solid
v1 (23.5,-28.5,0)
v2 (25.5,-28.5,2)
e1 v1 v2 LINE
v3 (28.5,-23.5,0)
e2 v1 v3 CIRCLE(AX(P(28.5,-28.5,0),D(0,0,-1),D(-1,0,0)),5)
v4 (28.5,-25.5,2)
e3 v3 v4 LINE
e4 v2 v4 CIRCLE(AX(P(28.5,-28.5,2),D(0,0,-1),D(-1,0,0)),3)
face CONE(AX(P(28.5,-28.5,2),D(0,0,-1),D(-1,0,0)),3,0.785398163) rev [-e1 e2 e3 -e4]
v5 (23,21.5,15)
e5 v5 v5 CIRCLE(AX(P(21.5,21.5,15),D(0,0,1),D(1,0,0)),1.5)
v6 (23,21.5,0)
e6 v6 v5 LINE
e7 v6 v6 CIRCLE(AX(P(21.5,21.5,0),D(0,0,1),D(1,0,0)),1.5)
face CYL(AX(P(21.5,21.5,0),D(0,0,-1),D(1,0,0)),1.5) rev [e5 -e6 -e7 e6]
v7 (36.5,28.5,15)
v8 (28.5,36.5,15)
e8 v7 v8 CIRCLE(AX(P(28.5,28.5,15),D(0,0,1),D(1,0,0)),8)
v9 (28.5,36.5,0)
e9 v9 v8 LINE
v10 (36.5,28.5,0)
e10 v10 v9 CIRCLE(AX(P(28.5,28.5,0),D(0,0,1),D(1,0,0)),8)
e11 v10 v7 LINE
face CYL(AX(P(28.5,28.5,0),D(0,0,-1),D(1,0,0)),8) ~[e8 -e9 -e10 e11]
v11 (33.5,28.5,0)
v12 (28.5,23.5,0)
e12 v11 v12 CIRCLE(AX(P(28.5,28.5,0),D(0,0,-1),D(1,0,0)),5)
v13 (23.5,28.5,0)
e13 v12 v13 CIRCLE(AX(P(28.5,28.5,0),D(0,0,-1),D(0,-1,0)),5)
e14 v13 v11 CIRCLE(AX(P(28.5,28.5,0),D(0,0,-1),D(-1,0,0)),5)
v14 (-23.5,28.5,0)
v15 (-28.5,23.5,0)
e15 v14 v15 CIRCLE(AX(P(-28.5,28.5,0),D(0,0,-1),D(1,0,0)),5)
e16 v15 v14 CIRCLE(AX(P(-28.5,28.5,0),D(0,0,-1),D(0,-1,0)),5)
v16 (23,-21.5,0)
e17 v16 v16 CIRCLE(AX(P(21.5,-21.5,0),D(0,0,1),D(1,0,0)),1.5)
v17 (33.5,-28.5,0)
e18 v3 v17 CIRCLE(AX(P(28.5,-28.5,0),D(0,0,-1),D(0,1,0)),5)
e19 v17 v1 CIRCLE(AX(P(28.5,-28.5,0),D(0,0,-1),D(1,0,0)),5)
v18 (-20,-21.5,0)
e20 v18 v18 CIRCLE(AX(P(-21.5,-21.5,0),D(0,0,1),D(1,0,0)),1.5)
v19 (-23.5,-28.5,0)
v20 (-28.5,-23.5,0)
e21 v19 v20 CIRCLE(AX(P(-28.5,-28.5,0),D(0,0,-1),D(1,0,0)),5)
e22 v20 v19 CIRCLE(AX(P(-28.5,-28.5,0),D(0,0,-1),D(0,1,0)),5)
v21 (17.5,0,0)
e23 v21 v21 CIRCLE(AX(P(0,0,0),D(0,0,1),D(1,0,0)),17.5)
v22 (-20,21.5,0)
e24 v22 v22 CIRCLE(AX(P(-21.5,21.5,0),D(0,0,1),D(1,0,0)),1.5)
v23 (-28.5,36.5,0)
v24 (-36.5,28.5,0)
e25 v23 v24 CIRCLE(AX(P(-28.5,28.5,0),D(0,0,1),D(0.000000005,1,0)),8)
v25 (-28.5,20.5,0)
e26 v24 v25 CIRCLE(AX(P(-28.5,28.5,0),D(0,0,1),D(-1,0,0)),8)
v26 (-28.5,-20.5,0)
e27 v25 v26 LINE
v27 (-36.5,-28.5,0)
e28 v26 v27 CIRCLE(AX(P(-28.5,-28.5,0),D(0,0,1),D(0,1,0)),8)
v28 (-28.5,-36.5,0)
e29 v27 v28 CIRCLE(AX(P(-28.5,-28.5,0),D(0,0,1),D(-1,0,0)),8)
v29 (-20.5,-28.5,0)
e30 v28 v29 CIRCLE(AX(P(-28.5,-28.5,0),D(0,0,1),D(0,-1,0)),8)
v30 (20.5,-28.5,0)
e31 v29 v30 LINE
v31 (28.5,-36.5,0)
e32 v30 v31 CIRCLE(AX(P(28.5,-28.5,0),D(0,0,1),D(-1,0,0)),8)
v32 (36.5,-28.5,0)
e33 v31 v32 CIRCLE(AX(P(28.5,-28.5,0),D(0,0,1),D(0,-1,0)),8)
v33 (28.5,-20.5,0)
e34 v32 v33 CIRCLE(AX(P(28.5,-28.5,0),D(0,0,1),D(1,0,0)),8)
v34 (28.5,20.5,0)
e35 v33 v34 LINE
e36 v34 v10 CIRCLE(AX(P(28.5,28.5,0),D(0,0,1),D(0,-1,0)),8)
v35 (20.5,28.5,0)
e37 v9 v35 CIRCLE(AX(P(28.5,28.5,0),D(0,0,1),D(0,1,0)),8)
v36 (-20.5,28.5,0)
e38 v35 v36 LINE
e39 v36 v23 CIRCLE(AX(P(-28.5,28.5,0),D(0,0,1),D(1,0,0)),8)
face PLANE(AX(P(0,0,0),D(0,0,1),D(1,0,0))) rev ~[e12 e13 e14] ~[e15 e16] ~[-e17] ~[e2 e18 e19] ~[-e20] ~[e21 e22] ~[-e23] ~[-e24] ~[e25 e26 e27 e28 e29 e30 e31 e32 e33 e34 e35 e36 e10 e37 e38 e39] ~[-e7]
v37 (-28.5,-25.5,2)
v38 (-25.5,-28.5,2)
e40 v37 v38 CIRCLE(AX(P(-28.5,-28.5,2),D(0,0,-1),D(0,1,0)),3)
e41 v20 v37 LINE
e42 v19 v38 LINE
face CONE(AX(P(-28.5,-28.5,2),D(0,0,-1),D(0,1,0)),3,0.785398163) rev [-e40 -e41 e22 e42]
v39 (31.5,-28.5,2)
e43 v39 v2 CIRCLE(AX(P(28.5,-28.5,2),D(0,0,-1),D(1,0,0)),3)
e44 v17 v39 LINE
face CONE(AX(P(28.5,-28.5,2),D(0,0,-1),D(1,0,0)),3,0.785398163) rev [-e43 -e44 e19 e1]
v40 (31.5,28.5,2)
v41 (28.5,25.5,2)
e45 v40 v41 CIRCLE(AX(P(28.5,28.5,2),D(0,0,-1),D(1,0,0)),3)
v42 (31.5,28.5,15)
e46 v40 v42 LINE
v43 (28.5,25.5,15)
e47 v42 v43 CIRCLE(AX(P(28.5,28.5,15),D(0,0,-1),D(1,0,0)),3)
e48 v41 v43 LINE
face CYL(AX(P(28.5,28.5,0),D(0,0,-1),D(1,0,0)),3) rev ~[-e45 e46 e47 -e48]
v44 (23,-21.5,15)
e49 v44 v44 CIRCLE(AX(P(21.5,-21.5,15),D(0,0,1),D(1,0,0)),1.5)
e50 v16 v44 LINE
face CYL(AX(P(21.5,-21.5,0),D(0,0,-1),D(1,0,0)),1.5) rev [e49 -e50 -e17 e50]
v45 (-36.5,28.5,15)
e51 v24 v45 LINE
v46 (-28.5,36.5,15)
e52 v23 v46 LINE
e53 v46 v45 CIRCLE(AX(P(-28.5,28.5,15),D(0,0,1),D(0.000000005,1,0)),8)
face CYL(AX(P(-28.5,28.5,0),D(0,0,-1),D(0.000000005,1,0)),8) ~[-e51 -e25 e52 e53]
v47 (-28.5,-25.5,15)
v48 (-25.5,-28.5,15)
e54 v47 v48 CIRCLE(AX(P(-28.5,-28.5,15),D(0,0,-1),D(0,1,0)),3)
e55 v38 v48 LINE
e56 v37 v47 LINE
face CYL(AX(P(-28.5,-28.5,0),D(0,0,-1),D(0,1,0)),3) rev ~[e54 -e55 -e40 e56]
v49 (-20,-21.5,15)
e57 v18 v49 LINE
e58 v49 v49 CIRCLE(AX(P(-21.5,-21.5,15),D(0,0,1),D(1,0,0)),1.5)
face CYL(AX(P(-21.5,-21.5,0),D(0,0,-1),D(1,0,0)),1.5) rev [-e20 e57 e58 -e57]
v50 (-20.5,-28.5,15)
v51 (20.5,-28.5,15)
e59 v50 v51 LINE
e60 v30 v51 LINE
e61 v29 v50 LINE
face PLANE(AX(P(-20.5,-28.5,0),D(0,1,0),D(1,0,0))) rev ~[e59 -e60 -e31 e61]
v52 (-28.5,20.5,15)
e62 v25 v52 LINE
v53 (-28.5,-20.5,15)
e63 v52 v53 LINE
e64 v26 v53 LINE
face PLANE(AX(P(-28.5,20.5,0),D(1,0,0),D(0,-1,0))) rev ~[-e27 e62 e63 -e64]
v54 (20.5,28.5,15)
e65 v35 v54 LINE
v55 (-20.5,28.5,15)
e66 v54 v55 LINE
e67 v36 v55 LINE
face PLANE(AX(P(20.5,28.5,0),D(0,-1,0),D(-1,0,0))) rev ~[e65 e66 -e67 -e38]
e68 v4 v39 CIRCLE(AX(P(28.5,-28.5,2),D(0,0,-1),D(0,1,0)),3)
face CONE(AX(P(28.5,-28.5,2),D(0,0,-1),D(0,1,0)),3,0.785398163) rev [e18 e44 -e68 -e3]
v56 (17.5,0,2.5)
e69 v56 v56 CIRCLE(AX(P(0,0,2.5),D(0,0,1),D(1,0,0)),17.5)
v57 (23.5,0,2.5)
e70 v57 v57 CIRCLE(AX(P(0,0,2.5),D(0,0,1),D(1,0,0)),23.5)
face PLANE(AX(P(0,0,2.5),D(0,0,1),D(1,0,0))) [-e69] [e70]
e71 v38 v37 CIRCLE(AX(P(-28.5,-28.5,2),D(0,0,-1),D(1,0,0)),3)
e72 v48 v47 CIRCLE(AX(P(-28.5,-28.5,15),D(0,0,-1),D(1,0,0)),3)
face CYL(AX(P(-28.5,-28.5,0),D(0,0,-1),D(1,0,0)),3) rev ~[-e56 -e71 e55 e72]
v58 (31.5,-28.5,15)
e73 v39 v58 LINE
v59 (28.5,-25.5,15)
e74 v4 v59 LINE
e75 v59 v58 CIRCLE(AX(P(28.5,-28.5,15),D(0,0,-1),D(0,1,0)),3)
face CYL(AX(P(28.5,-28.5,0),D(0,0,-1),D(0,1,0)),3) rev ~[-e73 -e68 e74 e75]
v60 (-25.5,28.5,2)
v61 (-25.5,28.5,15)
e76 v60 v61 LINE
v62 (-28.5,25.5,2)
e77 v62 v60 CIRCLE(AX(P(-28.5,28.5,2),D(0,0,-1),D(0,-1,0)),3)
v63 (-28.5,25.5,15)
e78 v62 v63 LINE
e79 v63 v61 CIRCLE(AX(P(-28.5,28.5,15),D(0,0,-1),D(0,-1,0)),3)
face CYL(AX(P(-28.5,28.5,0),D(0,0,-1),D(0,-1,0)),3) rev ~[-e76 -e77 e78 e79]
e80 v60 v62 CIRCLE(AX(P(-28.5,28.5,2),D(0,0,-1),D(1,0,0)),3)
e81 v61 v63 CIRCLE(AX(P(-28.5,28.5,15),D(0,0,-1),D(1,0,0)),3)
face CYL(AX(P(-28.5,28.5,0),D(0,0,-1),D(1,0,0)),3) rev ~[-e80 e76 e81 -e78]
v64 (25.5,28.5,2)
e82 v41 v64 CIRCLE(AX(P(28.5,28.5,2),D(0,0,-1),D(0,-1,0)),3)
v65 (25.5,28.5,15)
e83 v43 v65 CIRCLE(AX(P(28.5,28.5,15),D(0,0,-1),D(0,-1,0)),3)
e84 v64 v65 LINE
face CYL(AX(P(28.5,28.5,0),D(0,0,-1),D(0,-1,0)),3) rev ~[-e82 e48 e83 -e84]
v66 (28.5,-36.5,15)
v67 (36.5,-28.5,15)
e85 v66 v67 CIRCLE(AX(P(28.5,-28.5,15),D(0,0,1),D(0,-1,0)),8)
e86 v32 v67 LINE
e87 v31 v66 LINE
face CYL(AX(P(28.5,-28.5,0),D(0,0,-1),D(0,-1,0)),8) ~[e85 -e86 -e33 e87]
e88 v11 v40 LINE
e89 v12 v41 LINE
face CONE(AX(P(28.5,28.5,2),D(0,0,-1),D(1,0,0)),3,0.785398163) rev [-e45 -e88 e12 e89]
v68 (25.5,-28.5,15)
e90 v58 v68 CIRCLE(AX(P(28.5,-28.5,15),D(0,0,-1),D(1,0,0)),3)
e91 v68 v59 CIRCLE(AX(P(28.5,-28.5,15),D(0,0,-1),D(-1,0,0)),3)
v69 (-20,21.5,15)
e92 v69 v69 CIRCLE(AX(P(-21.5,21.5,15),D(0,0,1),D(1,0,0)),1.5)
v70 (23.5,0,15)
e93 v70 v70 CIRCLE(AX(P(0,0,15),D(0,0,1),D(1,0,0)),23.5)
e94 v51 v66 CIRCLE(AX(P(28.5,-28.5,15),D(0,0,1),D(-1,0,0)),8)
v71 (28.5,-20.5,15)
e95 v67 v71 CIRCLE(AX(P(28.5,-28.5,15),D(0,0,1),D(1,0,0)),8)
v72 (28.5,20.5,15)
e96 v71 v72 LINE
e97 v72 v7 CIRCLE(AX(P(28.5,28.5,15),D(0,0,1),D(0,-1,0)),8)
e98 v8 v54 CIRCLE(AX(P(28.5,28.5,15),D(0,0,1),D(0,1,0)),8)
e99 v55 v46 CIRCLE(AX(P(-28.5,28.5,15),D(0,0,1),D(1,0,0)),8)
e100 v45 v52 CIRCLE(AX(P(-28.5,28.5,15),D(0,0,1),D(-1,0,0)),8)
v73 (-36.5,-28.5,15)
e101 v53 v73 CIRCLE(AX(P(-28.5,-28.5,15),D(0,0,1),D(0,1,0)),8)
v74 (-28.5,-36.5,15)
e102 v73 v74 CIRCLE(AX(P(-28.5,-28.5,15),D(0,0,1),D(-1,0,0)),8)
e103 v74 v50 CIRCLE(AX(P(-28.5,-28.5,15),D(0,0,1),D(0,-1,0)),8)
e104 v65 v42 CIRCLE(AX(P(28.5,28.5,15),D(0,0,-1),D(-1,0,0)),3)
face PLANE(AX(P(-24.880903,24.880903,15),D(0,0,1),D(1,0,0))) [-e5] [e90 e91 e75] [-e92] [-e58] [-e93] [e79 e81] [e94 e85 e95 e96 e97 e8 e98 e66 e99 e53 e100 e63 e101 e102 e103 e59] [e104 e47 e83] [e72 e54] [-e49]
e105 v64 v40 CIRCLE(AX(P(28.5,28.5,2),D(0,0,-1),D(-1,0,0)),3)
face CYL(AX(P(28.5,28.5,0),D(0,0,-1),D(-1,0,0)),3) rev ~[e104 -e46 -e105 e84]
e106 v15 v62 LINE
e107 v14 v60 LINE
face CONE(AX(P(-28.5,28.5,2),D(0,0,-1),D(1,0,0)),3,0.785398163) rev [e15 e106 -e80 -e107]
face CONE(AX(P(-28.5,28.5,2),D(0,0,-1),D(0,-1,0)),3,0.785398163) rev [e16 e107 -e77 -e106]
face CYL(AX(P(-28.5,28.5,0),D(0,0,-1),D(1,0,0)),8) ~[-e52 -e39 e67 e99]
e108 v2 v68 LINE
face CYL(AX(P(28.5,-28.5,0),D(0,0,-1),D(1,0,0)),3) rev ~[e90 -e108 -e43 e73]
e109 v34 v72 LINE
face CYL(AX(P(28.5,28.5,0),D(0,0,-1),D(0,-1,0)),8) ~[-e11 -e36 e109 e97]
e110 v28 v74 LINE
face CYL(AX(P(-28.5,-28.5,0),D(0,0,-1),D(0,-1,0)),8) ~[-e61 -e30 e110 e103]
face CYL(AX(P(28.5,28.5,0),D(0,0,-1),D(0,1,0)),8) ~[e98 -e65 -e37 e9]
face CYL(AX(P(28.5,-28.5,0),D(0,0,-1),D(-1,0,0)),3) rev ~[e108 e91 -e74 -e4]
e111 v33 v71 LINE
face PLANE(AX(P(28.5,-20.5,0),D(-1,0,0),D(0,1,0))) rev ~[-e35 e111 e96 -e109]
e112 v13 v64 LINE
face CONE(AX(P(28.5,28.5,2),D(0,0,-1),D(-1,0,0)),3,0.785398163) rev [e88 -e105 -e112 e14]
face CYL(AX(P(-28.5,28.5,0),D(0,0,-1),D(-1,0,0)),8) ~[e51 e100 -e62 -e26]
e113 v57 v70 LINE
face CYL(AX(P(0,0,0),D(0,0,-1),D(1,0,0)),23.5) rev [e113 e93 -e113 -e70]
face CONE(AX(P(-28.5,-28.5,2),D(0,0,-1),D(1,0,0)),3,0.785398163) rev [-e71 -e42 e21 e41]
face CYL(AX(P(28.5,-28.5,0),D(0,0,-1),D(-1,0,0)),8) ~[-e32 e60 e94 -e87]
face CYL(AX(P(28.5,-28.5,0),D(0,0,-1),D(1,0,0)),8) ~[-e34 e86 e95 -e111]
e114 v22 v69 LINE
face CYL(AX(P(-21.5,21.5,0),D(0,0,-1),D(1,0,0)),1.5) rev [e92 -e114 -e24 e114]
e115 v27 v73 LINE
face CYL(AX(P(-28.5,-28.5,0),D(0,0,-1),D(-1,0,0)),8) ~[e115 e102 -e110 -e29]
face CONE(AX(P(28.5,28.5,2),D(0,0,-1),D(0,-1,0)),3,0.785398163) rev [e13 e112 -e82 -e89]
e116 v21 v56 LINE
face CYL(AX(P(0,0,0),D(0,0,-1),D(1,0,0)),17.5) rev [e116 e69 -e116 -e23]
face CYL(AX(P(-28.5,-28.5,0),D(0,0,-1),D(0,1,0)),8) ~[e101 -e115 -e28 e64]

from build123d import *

# Parameters (mm, degrees)
F0_R     = 1.5
F0_R_2   = 23.5
F1_DEPTH = 15
F0_R_3   = 17.5
F2_DEPTH = 2.5
F3_SIZE  = 2


# Not quite as in the source:
# - a feature names something its author has since deleted; it is built from what else it names


with BuildPart() as f1:
    # F0 (on Top) → F1 (new body)
    with BuildSketch(Plane.XY):
        with BuildLine():
            Line((-28.5, 25.5), (-28.5, 20.5))
            ThreePointArc((-28.5, 20.5), (-22.8431457505, 22.8431457505), (-20.5, 28.5))
            Line((-20.5, 28.5), (-25.5, 28.5))
            ThreePointArc((-25.5, 28.5), (-26.3786796564, 26.3786796564), (-28.5, 25.5))
        make_face()
        with BuildLine():
            Line((-20.5, -28.5), (20.5, -28.5))
            ThreePointArc((20.5, -28.5), (22.8431457505, -22.8431457505), (28.5, -20.5))
            Line((28.5, -20.5), (28.5, 20.5))
            ThreePointArc((28.5, 20.5), (22.8431457505, 22.8431457505), (20.5, 28.5))
            Line((20.5, 28.5), (-20.5, 28.5))
            ThreePointArc((-20.5, 28.5), (-22.8431457505, 22.8431457505), (-28.5, 20.5))
            Line((-28.5, 20.5), (-28.5, -20.5))
            ThreePointArc((-28.5, -20.5), (-22.8431457505, -22.8431457505), (-20.5, -28.5))
        make_face()
        with Locations((-21.5, -21.5)):
            Circle(F0_R, mode=Mode.SUBTRACT)
        with Locations((21.5, -21.5)):
            Circle(F0_R, mode=Mode.SUBTRACT)
        with Locations((-21.5, 21.5)):
            Circle(F0_R, mode=Mode.SUBTRACT)
        Circle(F0_R_2, mode=Mode.SUBTRACT)
        with Locations((21.5, 21.5)):
            Circle(F0_R, mode=Mode.SUBTRACT)
        with BuildLine():
            ThreePointArc((20.5, 28.5), (22.8431457505, 22.8431457505), (28.5, 20.5))
            Line((28.5, 20.5), (28.5, 25.5))
            ThreePointArc((28.5, 25.5), (26.3786796564, 26.3786796564), (25.5, 28.5))
            Line((25.5, 28.5), (20.5, 28.5))
        make_face()
        with BuildLine():
            ThreePointArc((28.5, 20.5), (34.1568542495, 22.8431457505), (36.5, 28.5))
            ThreePointArc((36.5, 28.5), (34.1568542495, 34.1568542495), (28.5, 36.5))
            ThreePointArc((28.5, 36.5), (22.8431457505, 34.1568542495), (20.5, 28.5))
            Line((20.5, 28.5), (25.5, 28.5))
            ThreePointArc((25.5, 28.5), (28.5, 31.5), (31.5, 28.5))
            ThreePointArc((31.5, 28.5), (30.6213203436, 26.3786796564), (28.5, 25.5))
            Line((28.5, 25.5), (28.5, 20.5))
        make_face()
        with BuildLine():
            ThreePointArc((20.5, -28.5), (22.8431457505, -34.1568542495), (28.5, -36.5))
            ThreePointArc((28.5, -36.5), (34.1568542495, -34.1568542495), (36.5, -28.5))
            ThreePointArc((36.5, -28.5), (34.1568542495, -22.8431457505), (28.5, -20.5))
            Line((28.5, -20.5), (28.5, -25.5))
            ThreePointArc((28.5, -25.5), (30.6213203436, -26.3786796564), (31.5, -28.5))
            ThreePointArc((31.5, -28.5), (28.5, -31.5), (25.5, -28.5))
            Line((25.5, -28.5), (20.5, -28.5))
        make_face()
        with BuildLine():
            ThreePointArc((28.5, -20.5), (22.8431457505, -22.8431457505), (20.5, -28.5))
            Line((20.5, -28.5), (25.5, -28.5))
            ThreePointArc((25.5, -28.5), (26.3786796564, -26.3786796564), (28.5, -25.5))
            Line((28.5, -25.5), (28.5, -20.5))
        make_face()
        with BuildLine():
            Line((-25.5, -28.5), (-20.5, -28.5))
            ThreePointArc((-20.5, -28.5), (-22.8431457505, -22.8431457505), (-28.5, -20.5))
            Line((-28.5, -20.5), (-28.5, -25.5))
            ThreePointArc((-28.5, -25.5), (-26.3786796564, -26.3786796564), (-25.5, -28.5))
        make_face()
        with BuildLine():
            ThreePointArc((-36.5, -28.5), (-34.1568542495, -34.1568542495), (-28.5, -36.5))
            ThreePointArc((-28.5, -36.5), (-22.8431457505, -34.1568542495), (-20.5, -28.5))
            Line((-20.5, -28.5), (-25.5, -28.5))
            ThreePointArc((-25.5, -28.5), (-30.6213203436, -30.6213203436), (-28.5, -25.5))
            Line((-28.5, -25.5), (-28.5, -20.5))
            ThreePointArc((-28.5, -20.5), (-34.1568542495, -22.8431457505), (-36.5, -28.5))
        make_face()
        with BuildLine():
            ThreePointArc((-28.4999999613, 36.5), (-34.1568542358, 34.1568542632), (-36.5, 28.5))
            ThreePointArc((-36.5, 28.5), (-34.1568542495, 22.8431457505), (-28.5, 20.5))
            Line((-28.5, 20.5), (-28.5, 25.5))
            ThreePointArc((-28.5, 25.5), (-30.6213203436, 30.6213203436), (-25.5, 28.5))
            Line((-25.5, 28.5), (-20.5, 28.5))
            ThreePointArc((-20.5, 28.5), (-22.8431457368, 34.1568542358), (-28.4999999613, 36.5))
        make_face()
    extrude(amount=F1_DEPTH)

    # F0 (on Top) → F2 (join)
    with BuildSketch(Plane.XY):
        Circle(F0_R_2)
        Circle(F0_R_3, mode=Mode.SUBTRACT)
    extrude(amount=F2_DEPTH)

    # F3
    f3_edges = [f1.edges().sort_by_distance(p)[0] for p in [
        (31.5, 28.5, 0),
        (-28.5, 31.5, 0),
        (-31.5, -28.5, 0),
        (28.5, -31.5, 0),
    ]]
    chamfer(f3_edges, length=F3_SIZE)


solid = f1.part
